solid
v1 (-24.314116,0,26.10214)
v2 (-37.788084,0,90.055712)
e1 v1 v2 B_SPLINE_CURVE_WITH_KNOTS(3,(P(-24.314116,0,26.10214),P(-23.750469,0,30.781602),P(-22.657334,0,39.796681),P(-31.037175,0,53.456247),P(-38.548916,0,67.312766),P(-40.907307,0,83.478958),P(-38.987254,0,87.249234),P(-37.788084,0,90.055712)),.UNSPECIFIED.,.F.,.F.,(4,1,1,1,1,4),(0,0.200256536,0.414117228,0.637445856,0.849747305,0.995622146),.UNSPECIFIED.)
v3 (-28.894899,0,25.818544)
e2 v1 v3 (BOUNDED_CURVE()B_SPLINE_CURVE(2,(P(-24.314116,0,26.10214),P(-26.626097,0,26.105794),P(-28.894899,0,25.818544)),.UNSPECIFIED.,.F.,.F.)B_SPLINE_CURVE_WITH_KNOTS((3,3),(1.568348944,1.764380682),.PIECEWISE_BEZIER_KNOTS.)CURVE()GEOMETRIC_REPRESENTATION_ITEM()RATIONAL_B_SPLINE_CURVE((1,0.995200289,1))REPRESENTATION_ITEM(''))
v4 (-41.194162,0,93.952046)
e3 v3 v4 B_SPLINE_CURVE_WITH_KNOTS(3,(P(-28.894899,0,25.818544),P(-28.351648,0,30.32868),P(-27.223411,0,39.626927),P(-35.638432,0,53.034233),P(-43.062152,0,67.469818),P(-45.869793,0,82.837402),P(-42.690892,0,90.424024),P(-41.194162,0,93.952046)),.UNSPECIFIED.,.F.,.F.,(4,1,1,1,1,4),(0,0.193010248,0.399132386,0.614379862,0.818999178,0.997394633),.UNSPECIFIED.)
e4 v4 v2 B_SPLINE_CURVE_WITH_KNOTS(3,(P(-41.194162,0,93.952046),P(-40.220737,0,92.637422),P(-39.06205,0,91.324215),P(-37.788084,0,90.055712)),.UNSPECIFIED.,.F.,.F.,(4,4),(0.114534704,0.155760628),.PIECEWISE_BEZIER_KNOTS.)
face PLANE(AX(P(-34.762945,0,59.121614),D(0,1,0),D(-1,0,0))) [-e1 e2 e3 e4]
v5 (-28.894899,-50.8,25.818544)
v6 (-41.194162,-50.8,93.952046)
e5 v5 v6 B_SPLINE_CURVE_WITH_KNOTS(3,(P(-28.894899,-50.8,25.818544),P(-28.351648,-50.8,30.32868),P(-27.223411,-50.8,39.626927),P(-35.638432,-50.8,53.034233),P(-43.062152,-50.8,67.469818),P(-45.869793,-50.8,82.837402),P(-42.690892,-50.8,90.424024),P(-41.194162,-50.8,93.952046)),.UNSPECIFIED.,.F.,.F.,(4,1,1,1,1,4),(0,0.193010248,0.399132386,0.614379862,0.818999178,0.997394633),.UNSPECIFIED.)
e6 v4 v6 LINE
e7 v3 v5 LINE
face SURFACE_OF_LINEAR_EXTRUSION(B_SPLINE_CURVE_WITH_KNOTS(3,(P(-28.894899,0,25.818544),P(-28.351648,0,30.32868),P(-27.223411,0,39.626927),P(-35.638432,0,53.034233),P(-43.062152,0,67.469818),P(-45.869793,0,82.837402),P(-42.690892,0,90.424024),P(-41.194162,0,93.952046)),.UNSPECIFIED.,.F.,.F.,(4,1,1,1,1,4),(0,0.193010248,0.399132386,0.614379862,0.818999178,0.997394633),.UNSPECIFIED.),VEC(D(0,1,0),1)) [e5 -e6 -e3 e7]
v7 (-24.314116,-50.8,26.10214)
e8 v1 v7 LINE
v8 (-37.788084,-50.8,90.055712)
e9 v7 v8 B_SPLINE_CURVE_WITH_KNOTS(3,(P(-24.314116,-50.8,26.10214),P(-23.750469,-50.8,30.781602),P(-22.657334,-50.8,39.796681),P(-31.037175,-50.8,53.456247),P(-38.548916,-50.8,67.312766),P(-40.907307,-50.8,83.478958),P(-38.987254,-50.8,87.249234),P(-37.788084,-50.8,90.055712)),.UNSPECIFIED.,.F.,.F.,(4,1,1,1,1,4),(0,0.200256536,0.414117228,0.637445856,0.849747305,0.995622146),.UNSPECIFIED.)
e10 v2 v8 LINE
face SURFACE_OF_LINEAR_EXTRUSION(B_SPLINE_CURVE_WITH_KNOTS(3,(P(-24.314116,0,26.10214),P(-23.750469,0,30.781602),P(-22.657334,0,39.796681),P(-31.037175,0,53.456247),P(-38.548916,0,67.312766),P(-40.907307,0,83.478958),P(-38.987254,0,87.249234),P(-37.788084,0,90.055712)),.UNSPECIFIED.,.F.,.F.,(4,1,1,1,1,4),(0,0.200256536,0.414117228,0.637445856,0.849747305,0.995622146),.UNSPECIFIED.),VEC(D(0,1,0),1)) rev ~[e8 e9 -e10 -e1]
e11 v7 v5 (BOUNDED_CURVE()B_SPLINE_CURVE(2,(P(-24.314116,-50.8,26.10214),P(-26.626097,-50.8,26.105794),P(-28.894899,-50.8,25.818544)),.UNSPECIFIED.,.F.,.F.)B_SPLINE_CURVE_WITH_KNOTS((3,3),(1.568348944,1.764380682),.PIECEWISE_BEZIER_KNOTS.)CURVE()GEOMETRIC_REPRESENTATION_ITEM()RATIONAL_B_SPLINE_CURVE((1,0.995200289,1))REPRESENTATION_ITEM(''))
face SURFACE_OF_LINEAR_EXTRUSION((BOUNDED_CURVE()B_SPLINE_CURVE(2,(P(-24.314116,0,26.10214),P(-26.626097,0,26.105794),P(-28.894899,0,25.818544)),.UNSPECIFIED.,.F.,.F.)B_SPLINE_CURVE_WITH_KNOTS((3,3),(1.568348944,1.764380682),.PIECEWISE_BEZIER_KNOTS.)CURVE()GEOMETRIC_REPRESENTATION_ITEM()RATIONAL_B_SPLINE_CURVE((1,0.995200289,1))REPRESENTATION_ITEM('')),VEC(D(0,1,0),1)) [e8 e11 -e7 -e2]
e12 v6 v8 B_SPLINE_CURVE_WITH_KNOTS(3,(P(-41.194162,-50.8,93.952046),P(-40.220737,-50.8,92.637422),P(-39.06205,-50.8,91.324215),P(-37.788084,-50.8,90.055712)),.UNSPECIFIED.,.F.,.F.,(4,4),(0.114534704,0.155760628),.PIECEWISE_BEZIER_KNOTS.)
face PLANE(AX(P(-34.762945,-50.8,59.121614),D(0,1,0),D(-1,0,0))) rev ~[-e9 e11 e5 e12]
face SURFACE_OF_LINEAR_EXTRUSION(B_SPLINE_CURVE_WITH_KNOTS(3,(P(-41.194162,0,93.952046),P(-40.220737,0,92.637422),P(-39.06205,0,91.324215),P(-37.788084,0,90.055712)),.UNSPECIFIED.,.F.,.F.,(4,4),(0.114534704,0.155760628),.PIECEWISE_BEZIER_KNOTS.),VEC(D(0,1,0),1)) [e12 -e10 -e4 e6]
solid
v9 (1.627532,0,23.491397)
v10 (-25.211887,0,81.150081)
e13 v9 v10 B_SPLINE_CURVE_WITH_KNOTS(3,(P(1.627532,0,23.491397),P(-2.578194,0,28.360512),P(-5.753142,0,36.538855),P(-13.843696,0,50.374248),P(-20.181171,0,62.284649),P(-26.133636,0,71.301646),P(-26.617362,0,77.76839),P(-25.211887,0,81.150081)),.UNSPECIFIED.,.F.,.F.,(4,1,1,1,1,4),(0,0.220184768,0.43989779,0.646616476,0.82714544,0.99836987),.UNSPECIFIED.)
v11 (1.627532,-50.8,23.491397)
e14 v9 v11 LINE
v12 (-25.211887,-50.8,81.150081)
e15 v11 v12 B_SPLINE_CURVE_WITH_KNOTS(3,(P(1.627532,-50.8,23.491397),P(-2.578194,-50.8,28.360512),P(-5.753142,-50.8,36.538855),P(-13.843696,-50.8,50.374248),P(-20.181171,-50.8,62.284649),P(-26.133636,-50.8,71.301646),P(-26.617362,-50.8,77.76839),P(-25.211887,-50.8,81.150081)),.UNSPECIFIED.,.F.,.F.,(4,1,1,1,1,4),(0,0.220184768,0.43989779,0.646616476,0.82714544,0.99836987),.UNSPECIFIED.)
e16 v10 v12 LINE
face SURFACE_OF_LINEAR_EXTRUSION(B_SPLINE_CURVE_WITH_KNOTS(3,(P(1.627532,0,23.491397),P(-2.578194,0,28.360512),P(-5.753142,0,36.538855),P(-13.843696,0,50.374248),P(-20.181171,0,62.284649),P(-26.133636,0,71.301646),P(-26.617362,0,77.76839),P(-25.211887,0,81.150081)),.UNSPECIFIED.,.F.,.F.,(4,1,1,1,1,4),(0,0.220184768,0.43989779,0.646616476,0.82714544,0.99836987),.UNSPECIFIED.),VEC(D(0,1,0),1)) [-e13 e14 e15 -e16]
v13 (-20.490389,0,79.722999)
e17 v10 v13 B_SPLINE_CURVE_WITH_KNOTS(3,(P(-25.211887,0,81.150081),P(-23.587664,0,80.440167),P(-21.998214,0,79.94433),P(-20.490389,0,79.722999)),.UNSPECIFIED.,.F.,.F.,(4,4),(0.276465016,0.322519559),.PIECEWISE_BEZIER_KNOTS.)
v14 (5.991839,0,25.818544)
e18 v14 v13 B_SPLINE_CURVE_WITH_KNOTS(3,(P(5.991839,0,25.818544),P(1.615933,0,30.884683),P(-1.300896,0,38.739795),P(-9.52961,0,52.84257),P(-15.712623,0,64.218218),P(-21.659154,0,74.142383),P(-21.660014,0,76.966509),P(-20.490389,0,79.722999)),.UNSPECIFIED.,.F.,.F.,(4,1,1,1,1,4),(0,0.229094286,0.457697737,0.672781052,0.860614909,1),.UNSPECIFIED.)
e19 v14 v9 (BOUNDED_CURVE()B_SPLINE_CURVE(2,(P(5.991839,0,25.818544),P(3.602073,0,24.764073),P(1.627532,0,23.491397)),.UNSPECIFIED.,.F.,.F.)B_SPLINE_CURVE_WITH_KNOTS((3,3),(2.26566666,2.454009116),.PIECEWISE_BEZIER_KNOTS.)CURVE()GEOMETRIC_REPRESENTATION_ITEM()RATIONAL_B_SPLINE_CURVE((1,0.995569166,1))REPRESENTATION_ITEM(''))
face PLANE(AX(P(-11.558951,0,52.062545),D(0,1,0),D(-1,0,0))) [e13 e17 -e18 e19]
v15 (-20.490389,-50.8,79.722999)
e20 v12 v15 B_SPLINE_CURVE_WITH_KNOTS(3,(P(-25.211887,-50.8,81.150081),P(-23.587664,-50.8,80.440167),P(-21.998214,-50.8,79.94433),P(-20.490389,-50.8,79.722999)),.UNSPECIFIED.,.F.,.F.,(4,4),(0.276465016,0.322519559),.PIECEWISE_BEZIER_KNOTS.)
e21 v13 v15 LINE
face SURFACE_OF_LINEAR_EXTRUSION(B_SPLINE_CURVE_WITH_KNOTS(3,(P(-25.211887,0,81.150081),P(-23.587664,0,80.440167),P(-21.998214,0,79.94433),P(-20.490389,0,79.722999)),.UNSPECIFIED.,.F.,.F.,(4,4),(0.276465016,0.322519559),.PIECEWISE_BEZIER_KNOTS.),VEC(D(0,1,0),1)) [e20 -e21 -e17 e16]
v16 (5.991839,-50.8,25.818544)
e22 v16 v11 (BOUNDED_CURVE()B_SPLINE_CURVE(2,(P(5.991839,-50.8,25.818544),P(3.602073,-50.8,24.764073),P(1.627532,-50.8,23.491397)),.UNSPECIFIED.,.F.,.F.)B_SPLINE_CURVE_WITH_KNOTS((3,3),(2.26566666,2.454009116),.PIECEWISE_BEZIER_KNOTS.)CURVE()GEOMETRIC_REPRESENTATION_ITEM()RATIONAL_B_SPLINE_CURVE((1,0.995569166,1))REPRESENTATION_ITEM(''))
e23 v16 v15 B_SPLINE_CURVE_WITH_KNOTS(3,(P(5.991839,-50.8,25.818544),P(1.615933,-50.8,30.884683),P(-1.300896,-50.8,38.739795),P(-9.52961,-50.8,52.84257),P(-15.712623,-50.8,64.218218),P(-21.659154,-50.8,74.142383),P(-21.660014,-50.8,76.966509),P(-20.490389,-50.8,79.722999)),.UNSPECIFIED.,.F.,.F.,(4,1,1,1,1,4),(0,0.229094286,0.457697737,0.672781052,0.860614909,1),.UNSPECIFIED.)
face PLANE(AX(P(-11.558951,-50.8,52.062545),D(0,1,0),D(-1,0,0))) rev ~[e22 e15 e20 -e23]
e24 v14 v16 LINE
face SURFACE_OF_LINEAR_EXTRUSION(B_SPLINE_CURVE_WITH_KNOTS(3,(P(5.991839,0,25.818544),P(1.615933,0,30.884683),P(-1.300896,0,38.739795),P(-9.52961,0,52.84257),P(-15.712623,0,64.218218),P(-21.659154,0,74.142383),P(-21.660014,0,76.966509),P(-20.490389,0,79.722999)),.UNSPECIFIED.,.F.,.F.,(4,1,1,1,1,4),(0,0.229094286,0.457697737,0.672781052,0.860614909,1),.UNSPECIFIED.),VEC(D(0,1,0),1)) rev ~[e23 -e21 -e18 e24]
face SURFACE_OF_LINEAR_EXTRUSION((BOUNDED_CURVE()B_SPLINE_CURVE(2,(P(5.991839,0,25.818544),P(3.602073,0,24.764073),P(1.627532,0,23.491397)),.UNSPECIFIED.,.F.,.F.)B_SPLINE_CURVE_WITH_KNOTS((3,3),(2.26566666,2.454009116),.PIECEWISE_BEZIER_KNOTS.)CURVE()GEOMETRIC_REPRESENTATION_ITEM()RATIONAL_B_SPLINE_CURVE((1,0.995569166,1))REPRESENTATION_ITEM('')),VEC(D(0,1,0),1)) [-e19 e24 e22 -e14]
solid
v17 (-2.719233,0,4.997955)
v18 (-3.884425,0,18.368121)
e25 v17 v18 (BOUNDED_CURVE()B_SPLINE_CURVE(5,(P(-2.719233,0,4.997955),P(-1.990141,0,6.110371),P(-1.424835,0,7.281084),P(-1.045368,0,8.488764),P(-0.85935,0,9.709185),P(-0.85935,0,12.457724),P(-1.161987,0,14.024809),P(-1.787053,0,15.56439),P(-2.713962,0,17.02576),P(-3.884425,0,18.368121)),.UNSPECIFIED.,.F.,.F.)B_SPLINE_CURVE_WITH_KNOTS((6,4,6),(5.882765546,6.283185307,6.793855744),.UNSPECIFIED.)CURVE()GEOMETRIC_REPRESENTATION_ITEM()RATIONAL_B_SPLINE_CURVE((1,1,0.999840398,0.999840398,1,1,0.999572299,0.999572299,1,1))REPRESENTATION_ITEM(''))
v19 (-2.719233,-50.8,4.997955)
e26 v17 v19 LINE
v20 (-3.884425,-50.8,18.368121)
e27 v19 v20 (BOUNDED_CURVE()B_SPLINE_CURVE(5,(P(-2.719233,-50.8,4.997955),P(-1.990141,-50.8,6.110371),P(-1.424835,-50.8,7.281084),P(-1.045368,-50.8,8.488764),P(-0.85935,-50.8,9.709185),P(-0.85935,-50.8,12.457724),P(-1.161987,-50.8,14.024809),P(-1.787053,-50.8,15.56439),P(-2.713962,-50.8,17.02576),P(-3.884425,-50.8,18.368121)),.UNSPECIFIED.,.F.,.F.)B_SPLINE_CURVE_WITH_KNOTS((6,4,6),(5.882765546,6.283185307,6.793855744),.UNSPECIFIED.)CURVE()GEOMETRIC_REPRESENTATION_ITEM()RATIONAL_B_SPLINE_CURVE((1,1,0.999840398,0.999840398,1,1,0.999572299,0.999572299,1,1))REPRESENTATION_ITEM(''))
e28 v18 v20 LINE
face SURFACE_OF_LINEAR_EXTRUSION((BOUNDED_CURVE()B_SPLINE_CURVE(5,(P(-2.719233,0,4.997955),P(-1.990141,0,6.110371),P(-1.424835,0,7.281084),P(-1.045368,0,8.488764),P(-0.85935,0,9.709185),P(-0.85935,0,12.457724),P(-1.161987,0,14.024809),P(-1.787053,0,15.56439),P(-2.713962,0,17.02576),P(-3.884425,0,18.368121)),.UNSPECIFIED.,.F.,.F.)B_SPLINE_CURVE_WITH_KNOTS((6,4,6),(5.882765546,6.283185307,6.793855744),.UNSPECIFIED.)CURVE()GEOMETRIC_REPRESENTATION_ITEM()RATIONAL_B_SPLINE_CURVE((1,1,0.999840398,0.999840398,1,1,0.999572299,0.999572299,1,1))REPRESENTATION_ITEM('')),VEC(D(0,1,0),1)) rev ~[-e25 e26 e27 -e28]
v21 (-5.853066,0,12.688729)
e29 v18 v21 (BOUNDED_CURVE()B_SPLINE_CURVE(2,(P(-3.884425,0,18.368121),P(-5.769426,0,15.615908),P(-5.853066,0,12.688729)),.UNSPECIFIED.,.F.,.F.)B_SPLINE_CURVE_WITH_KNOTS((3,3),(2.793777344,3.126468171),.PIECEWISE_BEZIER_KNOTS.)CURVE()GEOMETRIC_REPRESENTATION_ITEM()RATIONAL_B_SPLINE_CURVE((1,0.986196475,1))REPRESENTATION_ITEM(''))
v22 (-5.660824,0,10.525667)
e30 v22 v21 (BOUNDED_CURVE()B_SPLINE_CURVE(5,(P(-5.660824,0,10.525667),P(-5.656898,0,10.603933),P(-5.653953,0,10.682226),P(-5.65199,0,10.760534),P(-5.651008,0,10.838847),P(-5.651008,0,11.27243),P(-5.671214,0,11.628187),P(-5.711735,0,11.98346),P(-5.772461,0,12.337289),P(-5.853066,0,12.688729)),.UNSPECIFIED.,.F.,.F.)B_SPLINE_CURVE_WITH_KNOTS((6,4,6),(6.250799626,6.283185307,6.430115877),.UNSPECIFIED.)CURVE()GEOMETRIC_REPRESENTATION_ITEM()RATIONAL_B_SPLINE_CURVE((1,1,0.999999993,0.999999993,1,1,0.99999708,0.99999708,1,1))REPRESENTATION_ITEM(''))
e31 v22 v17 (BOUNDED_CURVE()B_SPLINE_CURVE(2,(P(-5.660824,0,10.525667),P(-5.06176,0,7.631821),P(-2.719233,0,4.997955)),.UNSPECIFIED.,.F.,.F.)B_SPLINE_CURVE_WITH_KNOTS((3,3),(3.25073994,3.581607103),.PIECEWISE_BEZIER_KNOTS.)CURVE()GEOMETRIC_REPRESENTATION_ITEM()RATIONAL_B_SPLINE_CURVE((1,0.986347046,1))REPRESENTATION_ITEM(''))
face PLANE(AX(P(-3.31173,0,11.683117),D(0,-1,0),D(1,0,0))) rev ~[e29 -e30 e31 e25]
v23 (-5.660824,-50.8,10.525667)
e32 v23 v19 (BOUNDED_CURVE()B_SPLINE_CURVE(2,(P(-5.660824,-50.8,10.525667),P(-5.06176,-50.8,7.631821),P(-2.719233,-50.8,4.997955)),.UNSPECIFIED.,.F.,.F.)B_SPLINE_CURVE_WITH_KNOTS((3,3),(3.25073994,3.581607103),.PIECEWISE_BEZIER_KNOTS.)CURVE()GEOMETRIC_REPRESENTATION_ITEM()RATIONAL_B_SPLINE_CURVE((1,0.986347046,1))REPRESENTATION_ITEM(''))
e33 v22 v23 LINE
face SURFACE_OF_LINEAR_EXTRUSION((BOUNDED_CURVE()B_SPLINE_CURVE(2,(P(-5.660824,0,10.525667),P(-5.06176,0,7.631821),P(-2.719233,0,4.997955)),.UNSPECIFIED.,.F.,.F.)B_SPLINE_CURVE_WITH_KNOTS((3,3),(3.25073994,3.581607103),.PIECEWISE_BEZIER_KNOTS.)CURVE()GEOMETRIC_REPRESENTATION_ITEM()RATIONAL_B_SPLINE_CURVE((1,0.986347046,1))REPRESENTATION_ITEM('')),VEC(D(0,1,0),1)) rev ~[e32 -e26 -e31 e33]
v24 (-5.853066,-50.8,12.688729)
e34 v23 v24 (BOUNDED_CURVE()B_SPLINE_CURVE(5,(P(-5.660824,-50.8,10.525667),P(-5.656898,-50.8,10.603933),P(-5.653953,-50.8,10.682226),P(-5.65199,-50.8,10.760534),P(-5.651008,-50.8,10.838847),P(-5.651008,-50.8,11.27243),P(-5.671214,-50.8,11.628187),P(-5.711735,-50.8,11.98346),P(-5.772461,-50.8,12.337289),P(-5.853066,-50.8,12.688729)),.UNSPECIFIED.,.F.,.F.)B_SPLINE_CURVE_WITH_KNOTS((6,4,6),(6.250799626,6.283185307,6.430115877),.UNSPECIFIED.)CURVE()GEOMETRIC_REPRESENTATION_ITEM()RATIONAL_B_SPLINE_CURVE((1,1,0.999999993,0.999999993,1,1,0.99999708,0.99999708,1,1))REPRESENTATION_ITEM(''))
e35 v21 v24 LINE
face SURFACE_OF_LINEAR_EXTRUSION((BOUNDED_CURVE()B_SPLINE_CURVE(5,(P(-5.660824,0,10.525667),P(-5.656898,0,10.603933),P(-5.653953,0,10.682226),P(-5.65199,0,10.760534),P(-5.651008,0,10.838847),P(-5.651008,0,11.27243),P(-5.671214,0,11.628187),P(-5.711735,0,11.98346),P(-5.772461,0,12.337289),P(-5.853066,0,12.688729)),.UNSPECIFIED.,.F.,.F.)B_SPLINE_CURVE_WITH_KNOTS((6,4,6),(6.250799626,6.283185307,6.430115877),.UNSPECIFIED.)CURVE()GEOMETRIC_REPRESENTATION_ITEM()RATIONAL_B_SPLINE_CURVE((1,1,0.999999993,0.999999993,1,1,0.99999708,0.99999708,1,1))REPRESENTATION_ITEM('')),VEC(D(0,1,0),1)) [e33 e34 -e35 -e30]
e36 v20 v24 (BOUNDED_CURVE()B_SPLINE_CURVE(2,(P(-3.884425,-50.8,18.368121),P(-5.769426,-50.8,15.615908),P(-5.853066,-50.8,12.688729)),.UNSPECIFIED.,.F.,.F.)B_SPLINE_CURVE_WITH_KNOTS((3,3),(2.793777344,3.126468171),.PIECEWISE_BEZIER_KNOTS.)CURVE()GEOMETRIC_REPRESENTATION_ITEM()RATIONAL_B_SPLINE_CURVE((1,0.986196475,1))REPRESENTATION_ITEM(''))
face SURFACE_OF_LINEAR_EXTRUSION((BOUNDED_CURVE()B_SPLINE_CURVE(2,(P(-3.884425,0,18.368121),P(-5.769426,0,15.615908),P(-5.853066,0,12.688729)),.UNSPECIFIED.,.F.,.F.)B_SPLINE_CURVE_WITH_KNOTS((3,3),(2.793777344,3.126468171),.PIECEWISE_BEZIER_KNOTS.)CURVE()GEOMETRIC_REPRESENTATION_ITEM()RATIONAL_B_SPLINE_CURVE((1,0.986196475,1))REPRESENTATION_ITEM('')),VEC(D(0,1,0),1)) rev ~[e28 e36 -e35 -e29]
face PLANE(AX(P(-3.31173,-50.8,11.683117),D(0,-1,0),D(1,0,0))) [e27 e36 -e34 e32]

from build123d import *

# Parameters (mm, degrees)
F1_DEPTH = 50.8


# Not quite as in the source:
# - a feature names something its author has since deleted; it is built from what else it names


with BuildPart() as f1:
    # F0 (on Front) → F1 (new body)
    with BuildSketch(Plane.XZ):
        with BuildLine():
            add(Edge.make_bspline(
                [(-24.3141159331, 26.1021399349), (-26.6260970552, 26.1057942616), (-28.8948994559, 25.8185440872)],
                knots=[1.5683489444, 1.5683489444, 1.5683489444, 1.7643806816, 1.7643806816, 1.7643806816], degree=2, weights=[1, 0.9952002892, 1]))
            add(Edge.make_bspline(
                [(-24.3141159331, 26.1021399349), (-23.7504685709, 30.7816022131), (-22.6573335885, 39.7966807836), (-31.0371752335, 53.456246822), (-38.5489160591, 67.3127661846), (-40.9073074567, 83.4789578935), (-38.987254402, 87.2492337999), (-37.7880842583, 90.0557118677)],
                knots=[0, 0, 0, 0, 0.2002565357, 0.4141172276, 0.6374458564, 0.8497473054, 0.9956221455, 0.9956221455, 0.9956221455, 0.9956221455], degree=3))
            add(Edge.make_bspline(
                [(-41.1941618229, 93.9520463131), (-40.2207372717, 92.6374220537), (-39.0620502408, 91.3242148197), (-37.7880842583, 90.0557118677)],
                knots=[0.1145347036, 0.1145347036, 0.1145347036, 0.1145347036, 0.1557606283, 0.1557606283, 0.1557606283, 0.1557606283], degree=3))
            add(Edge.make_bspline(
                [(-28.8948994559, 25.8185440872), (-28.3516476874, 30.3286799071), (-27.2234114209, 39.6269273648), (-35.638432395, 53.0342333907), (-43.0621524761, 67.4698179733), (-45.8697930663, 82.837401957), (-42.6908916889, 90.4240239555), (-41.1941618229, 93.9520463131)],
                knots=[0, 0, 0, 0, 0.193010248, 0.3991323855, 0.6143798623, 0.8189991781, 0.997394633, 0.997394633, 0.997394633, 0.997394633], degree=3))
        make_face()
    extrude(amount=F1_DEPTH)


with BuildPart() as f1b:
    # F0 (on Front) → F1, piece 2 (new body)
    with BuildSketch(Plane.XZ):
        with BuildLine():
            add(Edge.make_bspline(
                [(-0.8593497944, 10.9171546791), (-0.8593497944, 14.8987735909), (-3.884425209, 18.3681205211)],
                knots=[0, 0, 0, 0.5128680966, 0.5128680966, 0.5128680966], degree=2, weights=[1, 0.9673005687, 1]))
            add(Edge.make_bspline(
                [(-3.884425209, 18.3681205211), (-5.7694255428, 15.6159078961), (-5.8530664589, 12.6887294195)],
                knots=[2.7937773438, 2.7937773438, 2.7937773438, 3.1264681713, 3.1264681713, 3.1264681713], degree=2, weights=[1, 0.9861964753, 1]))
            add(Edge.make_bspline(
                [(-5.6510078625, 10.9171546791), (-5.6510078625, 11.8077482948), (-5.8530664589, 12.6887294195)],
                knots=[0, 0, 0, 0.147056621, 0.147056621, 0.147056621], degree=2, weights=[1, 0.9972980114, 1]))
            add(Edge.make_bspline(
                [(-5.6608244172, 10.5256666684), (-5.6510078625, 10.7213593391), (-5.6510078625, 10.9171546791)],
                knots=[6.2507996255, 6.2507996255, 6.2507996255, 6.2831853072, 6.2831853072, 6.2831853072], degree=2, weights=[1, 0.9998688988, 1]))
            add(Edge.make_bspline(
                [(-5.6608244172, 10.5256666684), (-5.0617599039, 7.6318214617), (-2.7192334462, 4.9979547786)],
                knots=[3.2507399401, 3.2507399401, 3.2507399401, 3.5816071025, 3.5816071025, 3.5816071025], degree=2, weights=[1, 0.9863470459, 1]))
            add(Edge.make_bspline(
                [(-2.7192334462, 4.9979547786), (-0.8593497944, 7.8356784138), (-0.8593497944, 10.9171546791)],
                knots=[5.8827655458, 5.8827655458, 5.8827655458, 6.2831853072, 6.2831853072, 6.2831853072], degree=2, weights=[1, 0.9800248594, 1]))
        make_face()
    extrude(amount=F1_DEPTH)


with BuildPart() as f1c:
    # F0 (on Front) → F1, piece 3 (new body)
    with BuildSketch(Plane.XZ):
        with BuildLine():
            add(Edge.make_bspline(
                [(1.6275324331, 23.4913965441), (-2.5781939039, 28.3605122499), (-5.7531419947, 36.5388547463), (-13.843696099, 50.3742483725), (-20.181170777, 62.2846491187), (-26.1336358697, 71.3016463879), (-26.6173623264, 77.7683902544), (-25.2118867969, 81.1500811666)],
                knots=[0, 0, 0, 0, 0.2201847678, 0.4398977895, 0.6466164756, 0.82714544, 0.9983698701, 0.9983698701, 0.9983698701, 0.9983698701], degree=3))
            add(Edge.make_bspline(
                [(5.9918386386, 25.8185440664), (3.6020725269, 24.7640726232), (1.6275324331, 23.4913965441)],
                knots=[2.2656666605, 2.2656666605, 2.2656666605, 2.4540091157, 2.4540091157, 2.4540091157], degree=2, weights=[1, 0.9955691659, 1]))
            add(Edge.make_bspline(
                [(5.9918386386, 25.8185440664), (1.6159325214, 30.8846828247), (-1.3008960748, 38.7397948712), (-9.5296098113, 52.8425702091), (-15.7126231247, 64.2182177816), (-21.6591543897, 74.1423833807), (-21.6600143389, 76.9665087767), (-20.4903893837, 79.7229993409)],
                knots=[0, 0, 0, 0, 0.229094286, 0.4576977372, 0.6727810523, 0.8606149094, 1, 1, 1, 1], degree=3))
            add(Edge.make_bspline(
                [(-25.2118867969, 81.1500811666), (-23.5876635098, 80.4401666232), (-21.9982141694, 79.9443299939), (-20.4903893837, 79.7229993409)],
                knots=[0.2764650159, 0.2764650159, 0.2764650159, 0.2764650159, 0.3225195587, 0.3225195587, 0.3225195587, 0.3225195587], degree=3))
        make_face()
    extrude(amount=F1_DEPTH)


solid = Compound([f1.part, f1b.part, f1c.part])
